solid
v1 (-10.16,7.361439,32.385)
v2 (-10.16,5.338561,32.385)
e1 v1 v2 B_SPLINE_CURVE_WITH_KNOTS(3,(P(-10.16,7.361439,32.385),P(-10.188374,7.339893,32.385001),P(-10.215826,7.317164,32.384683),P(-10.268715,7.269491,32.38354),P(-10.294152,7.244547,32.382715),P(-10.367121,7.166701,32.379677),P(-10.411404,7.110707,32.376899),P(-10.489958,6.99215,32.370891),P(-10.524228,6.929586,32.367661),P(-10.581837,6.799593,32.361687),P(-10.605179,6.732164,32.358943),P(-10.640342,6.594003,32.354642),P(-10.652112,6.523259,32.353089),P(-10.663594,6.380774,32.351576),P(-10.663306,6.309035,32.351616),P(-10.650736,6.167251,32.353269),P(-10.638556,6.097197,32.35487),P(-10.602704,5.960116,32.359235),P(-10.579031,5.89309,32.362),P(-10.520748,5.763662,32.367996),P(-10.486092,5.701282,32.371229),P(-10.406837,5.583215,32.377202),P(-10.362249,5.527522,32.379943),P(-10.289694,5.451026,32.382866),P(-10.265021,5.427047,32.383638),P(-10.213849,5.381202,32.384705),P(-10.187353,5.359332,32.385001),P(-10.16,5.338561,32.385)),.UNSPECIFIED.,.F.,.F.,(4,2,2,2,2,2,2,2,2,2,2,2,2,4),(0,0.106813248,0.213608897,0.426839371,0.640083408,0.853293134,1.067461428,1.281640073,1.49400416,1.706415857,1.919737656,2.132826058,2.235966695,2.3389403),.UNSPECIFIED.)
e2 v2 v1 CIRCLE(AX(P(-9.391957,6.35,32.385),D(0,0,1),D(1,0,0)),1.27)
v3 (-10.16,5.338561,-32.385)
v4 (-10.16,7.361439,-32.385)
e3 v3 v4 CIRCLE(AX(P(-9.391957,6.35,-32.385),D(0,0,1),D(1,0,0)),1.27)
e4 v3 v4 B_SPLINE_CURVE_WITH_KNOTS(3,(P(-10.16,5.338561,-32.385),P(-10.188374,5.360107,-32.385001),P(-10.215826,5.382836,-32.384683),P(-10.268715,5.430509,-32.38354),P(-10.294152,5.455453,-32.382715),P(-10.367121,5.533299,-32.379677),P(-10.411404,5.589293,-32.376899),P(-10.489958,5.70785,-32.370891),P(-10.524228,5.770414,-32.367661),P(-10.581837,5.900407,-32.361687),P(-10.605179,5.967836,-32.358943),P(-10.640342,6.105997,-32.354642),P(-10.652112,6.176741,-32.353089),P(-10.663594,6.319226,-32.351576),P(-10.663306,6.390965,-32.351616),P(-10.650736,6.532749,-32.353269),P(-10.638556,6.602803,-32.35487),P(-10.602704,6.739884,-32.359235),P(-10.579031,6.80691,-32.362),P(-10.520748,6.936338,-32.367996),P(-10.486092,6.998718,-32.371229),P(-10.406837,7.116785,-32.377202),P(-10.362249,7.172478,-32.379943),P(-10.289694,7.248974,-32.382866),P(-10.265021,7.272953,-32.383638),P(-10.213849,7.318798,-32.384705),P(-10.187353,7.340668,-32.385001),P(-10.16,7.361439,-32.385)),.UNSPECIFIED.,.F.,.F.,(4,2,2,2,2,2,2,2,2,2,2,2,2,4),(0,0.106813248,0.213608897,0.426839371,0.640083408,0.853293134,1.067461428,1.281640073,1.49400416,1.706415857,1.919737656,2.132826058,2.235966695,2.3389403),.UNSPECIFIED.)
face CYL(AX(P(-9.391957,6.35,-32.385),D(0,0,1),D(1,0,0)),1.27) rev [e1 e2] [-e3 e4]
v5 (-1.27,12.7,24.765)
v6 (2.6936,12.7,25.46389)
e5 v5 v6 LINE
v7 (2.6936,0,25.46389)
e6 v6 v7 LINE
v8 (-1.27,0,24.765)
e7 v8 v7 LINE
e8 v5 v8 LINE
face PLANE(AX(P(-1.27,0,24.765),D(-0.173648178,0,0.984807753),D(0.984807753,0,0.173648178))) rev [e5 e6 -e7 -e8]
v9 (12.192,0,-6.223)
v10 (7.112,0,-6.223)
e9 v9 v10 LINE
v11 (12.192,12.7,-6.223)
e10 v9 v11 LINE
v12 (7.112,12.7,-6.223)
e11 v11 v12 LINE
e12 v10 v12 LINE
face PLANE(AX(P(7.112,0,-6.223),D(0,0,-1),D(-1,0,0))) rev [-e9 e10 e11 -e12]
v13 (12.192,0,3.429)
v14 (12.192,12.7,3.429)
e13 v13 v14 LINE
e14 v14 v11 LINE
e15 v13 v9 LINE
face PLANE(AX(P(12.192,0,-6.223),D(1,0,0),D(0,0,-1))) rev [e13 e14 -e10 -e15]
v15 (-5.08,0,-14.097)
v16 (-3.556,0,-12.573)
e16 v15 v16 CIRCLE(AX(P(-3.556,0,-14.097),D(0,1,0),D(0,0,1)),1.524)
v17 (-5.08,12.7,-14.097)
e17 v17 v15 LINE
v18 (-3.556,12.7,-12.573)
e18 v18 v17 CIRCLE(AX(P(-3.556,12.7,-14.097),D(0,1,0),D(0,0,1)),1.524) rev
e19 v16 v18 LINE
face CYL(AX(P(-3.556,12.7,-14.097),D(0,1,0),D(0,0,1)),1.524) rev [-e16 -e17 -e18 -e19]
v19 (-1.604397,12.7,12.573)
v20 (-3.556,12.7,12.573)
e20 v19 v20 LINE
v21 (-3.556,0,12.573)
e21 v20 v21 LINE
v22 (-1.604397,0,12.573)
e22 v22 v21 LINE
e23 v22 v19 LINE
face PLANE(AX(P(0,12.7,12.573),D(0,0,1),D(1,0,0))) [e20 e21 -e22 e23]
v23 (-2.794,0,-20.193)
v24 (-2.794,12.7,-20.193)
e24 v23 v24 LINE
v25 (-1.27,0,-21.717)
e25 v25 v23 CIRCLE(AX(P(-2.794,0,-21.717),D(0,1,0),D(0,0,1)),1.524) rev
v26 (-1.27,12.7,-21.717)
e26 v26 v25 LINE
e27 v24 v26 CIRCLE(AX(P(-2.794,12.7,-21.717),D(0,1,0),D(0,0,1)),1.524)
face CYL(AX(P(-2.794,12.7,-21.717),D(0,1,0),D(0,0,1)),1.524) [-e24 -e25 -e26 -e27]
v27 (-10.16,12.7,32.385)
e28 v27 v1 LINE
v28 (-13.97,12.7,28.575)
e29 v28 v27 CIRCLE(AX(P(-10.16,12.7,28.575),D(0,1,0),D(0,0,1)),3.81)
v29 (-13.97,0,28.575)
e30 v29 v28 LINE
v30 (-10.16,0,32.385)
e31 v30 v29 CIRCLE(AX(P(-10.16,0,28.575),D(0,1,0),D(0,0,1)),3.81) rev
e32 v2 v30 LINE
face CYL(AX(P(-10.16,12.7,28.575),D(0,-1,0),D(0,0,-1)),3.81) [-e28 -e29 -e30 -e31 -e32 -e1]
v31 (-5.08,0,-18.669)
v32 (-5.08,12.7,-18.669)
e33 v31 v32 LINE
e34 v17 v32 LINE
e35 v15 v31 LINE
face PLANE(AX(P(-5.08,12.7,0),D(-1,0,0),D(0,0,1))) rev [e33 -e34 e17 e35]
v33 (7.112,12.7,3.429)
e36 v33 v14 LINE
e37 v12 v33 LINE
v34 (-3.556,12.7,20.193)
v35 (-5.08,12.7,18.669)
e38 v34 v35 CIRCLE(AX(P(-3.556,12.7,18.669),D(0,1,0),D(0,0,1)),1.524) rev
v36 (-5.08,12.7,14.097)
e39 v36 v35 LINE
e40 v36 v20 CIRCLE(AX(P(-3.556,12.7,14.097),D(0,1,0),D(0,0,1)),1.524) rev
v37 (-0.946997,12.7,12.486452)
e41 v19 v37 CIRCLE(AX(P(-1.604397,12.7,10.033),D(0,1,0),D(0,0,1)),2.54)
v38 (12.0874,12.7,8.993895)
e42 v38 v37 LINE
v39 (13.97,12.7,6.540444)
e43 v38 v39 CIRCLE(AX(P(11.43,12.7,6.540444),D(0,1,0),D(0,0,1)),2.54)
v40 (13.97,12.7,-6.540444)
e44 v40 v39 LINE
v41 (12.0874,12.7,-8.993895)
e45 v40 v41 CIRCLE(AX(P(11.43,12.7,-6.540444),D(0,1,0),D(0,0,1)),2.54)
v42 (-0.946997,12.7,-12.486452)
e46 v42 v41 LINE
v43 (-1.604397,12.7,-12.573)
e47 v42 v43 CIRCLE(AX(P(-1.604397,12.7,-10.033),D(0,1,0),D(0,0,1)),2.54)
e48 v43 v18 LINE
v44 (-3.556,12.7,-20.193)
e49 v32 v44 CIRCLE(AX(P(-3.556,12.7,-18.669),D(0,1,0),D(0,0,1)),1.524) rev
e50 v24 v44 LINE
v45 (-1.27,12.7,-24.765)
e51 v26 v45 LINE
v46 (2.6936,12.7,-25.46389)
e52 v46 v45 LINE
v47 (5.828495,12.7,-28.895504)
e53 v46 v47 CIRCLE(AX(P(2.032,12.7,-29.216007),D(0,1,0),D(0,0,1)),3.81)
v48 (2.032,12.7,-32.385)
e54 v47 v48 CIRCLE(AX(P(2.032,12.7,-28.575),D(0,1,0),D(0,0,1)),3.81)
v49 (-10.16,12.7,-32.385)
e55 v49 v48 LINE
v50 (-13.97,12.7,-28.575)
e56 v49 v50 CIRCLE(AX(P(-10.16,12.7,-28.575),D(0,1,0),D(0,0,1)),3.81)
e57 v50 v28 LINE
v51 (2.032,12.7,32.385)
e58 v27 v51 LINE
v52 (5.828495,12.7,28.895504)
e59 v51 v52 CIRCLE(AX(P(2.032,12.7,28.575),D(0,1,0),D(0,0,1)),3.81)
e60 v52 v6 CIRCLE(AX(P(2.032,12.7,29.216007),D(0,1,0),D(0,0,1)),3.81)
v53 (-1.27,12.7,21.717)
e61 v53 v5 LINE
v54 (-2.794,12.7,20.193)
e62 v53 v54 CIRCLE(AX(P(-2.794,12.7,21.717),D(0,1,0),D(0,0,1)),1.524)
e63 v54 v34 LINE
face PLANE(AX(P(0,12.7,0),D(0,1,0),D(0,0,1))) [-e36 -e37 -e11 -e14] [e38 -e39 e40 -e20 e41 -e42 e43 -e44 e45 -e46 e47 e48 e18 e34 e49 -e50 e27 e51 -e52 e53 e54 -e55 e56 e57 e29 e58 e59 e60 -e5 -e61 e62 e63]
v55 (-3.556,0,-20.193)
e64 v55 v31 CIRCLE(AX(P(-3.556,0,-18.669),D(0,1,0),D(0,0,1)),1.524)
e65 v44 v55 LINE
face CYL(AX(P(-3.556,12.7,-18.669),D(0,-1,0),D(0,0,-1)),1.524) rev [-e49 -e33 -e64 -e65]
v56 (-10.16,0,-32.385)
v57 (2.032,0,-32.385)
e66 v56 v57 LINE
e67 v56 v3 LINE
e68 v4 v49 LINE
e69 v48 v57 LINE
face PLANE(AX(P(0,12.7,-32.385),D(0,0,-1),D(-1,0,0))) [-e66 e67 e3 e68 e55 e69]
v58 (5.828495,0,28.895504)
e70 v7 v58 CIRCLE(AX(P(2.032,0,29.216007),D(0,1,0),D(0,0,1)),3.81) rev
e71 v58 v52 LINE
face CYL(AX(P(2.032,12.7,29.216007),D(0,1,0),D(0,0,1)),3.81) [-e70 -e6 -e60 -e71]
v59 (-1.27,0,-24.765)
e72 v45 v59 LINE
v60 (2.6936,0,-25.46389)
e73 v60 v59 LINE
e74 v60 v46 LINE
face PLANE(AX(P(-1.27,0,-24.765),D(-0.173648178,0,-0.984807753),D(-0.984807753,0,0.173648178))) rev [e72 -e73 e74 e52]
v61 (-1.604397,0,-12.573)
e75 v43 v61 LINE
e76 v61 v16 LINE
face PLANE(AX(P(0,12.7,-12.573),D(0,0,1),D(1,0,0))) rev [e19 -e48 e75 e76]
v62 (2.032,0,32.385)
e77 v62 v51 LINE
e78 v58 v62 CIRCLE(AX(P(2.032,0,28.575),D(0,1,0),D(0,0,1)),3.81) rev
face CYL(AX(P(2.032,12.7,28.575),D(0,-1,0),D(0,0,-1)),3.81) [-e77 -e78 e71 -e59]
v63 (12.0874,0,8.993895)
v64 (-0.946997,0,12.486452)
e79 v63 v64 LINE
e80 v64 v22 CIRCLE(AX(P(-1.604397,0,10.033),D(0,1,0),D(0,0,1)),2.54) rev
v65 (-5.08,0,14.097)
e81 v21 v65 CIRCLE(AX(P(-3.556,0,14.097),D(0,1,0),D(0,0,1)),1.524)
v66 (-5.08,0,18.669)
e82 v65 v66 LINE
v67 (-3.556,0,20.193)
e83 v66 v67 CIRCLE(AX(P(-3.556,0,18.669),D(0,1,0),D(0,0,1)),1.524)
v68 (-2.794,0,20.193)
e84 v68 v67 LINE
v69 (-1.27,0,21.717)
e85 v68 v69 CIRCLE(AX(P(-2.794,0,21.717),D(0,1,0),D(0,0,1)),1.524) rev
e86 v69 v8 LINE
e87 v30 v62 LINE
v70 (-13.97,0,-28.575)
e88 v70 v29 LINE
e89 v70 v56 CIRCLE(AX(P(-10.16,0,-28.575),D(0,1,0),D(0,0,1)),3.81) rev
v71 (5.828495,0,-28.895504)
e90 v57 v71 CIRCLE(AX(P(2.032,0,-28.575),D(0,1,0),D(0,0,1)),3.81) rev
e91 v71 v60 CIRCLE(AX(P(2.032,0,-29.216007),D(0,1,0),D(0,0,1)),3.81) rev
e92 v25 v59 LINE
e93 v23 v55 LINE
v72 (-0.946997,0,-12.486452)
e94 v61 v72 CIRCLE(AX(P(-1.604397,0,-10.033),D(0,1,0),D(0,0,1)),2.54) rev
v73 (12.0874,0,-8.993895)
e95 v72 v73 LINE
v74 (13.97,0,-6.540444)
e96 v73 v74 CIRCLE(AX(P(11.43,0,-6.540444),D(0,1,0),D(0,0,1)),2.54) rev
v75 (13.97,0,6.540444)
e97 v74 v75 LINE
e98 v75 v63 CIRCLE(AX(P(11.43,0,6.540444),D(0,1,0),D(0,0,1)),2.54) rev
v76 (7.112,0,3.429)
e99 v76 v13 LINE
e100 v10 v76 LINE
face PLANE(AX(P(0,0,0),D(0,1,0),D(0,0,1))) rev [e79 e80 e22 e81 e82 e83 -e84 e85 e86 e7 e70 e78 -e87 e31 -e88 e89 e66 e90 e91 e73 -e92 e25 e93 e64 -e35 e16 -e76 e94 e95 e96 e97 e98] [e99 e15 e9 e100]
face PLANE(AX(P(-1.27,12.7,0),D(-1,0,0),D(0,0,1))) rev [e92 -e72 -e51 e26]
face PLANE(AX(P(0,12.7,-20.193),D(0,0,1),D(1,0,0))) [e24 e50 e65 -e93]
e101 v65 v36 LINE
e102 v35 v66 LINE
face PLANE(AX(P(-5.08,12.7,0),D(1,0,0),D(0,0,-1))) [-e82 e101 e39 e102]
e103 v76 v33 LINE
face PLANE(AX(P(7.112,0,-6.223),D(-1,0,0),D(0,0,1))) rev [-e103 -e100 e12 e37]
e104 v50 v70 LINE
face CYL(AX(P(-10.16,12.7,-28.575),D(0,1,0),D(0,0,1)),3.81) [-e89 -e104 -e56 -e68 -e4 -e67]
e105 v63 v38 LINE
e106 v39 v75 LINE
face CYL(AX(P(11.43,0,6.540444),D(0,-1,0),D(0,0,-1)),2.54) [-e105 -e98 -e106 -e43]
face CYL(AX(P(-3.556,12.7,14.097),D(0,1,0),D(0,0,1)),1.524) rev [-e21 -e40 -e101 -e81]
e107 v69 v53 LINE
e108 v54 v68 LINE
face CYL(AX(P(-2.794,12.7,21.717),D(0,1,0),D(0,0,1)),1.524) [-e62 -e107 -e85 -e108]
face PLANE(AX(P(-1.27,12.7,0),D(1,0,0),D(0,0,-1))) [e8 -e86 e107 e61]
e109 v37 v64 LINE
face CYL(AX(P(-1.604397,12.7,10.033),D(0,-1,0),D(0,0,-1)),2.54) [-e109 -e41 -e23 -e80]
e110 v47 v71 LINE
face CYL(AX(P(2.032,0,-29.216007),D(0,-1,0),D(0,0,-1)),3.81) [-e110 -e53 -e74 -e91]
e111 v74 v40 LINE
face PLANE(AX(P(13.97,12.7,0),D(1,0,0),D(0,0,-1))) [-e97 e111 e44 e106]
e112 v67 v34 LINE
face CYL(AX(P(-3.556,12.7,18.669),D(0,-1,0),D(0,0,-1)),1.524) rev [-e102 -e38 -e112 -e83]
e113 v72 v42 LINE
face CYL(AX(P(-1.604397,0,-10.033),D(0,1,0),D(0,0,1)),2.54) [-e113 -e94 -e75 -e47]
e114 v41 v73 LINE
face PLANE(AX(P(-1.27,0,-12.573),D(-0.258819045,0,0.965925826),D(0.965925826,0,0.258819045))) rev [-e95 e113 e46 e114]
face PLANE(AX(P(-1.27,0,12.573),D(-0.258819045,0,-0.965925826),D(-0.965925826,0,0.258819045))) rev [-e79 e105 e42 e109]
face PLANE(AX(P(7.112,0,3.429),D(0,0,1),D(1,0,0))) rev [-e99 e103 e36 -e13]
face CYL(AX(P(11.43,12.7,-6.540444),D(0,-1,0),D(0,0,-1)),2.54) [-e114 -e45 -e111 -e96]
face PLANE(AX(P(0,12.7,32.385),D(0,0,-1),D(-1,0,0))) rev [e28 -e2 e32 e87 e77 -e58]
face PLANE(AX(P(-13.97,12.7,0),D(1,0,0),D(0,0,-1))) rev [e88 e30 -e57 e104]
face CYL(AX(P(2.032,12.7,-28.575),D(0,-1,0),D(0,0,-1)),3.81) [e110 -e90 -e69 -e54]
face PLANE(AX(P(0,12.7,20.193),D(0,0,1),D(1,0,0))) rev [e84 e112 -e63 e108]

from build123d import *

# Parameters (mm, degrees)
BOSS_EXTRUDE1_DEPTH = 12.7
CUT_EXTRUDE1_DEPTH  = 38.486519244
FILLET4_R           = 1.524
FILLET5_R           = 3.81
SKETCH3_R           = 1.27
CUT_EXTRUDE2_DEPTH  = 68.465574925
SKETCH4_W           = 5.08
SKETCH4_H           = 9.652
CUT_EXTRUDE3_DEPTH  = 38.486519401
FILLET6_R           = 2.54


with BuildPart() as part:
    # Sketch1 → Boss-Extrude1 (new body)
    with BuildSketch(Plane(origin=(0, 0, 0), x_dir=(1, 0, 0), z_dir=(0, 1, 0))):
        Polygon((5.842, 32.385), (-13.97, 32.385), (-13.97, -32.385), (5.842, -32.385), (5.842, -24.765), (-1.27, -24.765), (-1.27, -20.193), (-5.08, -20.193), (-5.08, -12.573), (-1.27, -12.573), (5.842, -12.573), (13.97, -12.573), (13.97, 12.573), (5.842, 12.573), (-1.27, 12.573), (-5.08, 12.573), (-5.08, 20.193), (-1.27, 20.193), (-1.27, 24.765), (5.842, 24.765), align=None)
    extrude(amount=BOSS_EXTRUDE1_DEPTH)

    # Sketch2 → Cut-Extrude1 (cut, through all)
    with BuildSketch(Plane(origin=(0, 12.7, 0), x_dir=(1, 0, 0), z_dir=(0, 1, 0))):
        Polygon((-1.27, 24.765), (5.842, 26.019037487), (5.842, 24.765), align=None)
        Polygon((-1.27, -24.765), (5.842, -26.019037487), (5.842, -24.765), align=None)
        Polygon((-1.27, 12.573), (13.97, 8.489454307), (13.97, 12.573), align=None)
        Polygon((-1.27, -12.573), (13.97, -8.489454307), (13.97, -12.573), align=None)
    extrude(amount=-CUT_EXTRUDE1_DEPTH, mode=Mode.SUBTRACT)

    # Fillet4
    fillet4_edges = [part.edges().sort_by_distance(p)[0] for p in [
        (-5.08, 6.35, 20.193),
        (-1.27, 6.35, 20.193),
        (-1.27, 6.35, -20.193),
        (-5.08, 6.35, -20.193),
        (-5.08, 6.35, -12.573),
        (-5.08, 6.35, 12.573),
    ]]
    fillet(fillet4_edges, radius=FILLET4_R)

    # Fillet5
    # the kernel refuses this fillet: 3.81 mm, written as the material it takes off along each edge
    with BuildSketch(Plane(origin=(-13.97, -9.525, 32.385), x_dir=(0, 0, -1), z_dir=(0, 1, 0)), Plane(origin=(-13.97, -9.525, -32.385), x_dir=(1, 0, 0), z_dir=(0, 1, 0)), Plane(origin=(5.842, -9.525, -32.385), x_dir=(0, 0, 1), z_dir=(0, 1, 0)), Plane(origin=(5.842, -9.525, 32.385), x_dir=(-1, 0, 0), z_dir=(0, 1, 0))) as fillet5_piece_1:
        with BuildLine():
            CenterArc((FILLET5_R, -FILLET5_R), FILLET5_R, 90, 90)
            Line((0, -FILLET5_R), (0, 0))
            Line((0, 0), (FILLET5_R, 0))
        make_face()
    extrude(amount=31.75, mode=Mode.SUBTRACT)
    with BuildSketch(Plane(origin=(5.842, 20.692423987, -26.019037487), x_dir=(-0.9848077530122095, 0, 0.17364817766692292), z_dir=(0, -1, 0)), Plane(origin=(5.842, 20.692423987, 26.019037487), x_dir=(0, 0, 1), z_dir=(0, -1, 0))) as fillet5_piece_2:
        with BuildLine():
            CenterArc((FILLET5_R * 0.839099631177, FILLET5_R), FILLET5_R, 190, 80)
            Line((-FILLET5_R * 0.145708121835, FILLET5_R * 0.826351822333), (0, 0))
            Line((0, 0), (FILLET5_R * 0.839099631177, 0))
        make_face()
    extrude(amount=28.684847974, mode=Mode.SUBTRACT)

    # Sketch3 → Cut-Extrude2 (cut, through all)
    with BuildSketch(Plane.XY.offset(32.385)):
        with Locations(Location((-9.391956596, 6.35, 0), (0, 0, 127.211471896))):
            Circle(SKETCH3_R)
    extrude(amount=-CUT_EXTRUDE2_DEPTH, mode=Mode.SUBTRACT)

    # Sketch4 → Cut-Extrude3 (cut, through all)
    with BuildSketch(Plane(origin=(0, 12.7, 0), x_dir=(1, 0, 0), z_dir=(0, 1, 0))):
        with Locations((9.652, 1.397)):
            Rectangle(SKETCH4_W, SKETCH4_H)
    extrude(amount=-CUT_EXTRUDE3_DEPTH, mode=Mode.SUBTRACT)

    # Fillet6
    fillet6_edges = [part.edges().sort_by_distance(p)[0] for p in [
        (-1.27, 6.35, 12.573),
        (13.97, 6.35, 8.489454307),
        (-1.27, 6.35, -12.573),
        (13.97, 6.35, -8.489454307),
    ]]
    fillet(fillet6_edges, radius=FILLET6_R)


solid = part.part
